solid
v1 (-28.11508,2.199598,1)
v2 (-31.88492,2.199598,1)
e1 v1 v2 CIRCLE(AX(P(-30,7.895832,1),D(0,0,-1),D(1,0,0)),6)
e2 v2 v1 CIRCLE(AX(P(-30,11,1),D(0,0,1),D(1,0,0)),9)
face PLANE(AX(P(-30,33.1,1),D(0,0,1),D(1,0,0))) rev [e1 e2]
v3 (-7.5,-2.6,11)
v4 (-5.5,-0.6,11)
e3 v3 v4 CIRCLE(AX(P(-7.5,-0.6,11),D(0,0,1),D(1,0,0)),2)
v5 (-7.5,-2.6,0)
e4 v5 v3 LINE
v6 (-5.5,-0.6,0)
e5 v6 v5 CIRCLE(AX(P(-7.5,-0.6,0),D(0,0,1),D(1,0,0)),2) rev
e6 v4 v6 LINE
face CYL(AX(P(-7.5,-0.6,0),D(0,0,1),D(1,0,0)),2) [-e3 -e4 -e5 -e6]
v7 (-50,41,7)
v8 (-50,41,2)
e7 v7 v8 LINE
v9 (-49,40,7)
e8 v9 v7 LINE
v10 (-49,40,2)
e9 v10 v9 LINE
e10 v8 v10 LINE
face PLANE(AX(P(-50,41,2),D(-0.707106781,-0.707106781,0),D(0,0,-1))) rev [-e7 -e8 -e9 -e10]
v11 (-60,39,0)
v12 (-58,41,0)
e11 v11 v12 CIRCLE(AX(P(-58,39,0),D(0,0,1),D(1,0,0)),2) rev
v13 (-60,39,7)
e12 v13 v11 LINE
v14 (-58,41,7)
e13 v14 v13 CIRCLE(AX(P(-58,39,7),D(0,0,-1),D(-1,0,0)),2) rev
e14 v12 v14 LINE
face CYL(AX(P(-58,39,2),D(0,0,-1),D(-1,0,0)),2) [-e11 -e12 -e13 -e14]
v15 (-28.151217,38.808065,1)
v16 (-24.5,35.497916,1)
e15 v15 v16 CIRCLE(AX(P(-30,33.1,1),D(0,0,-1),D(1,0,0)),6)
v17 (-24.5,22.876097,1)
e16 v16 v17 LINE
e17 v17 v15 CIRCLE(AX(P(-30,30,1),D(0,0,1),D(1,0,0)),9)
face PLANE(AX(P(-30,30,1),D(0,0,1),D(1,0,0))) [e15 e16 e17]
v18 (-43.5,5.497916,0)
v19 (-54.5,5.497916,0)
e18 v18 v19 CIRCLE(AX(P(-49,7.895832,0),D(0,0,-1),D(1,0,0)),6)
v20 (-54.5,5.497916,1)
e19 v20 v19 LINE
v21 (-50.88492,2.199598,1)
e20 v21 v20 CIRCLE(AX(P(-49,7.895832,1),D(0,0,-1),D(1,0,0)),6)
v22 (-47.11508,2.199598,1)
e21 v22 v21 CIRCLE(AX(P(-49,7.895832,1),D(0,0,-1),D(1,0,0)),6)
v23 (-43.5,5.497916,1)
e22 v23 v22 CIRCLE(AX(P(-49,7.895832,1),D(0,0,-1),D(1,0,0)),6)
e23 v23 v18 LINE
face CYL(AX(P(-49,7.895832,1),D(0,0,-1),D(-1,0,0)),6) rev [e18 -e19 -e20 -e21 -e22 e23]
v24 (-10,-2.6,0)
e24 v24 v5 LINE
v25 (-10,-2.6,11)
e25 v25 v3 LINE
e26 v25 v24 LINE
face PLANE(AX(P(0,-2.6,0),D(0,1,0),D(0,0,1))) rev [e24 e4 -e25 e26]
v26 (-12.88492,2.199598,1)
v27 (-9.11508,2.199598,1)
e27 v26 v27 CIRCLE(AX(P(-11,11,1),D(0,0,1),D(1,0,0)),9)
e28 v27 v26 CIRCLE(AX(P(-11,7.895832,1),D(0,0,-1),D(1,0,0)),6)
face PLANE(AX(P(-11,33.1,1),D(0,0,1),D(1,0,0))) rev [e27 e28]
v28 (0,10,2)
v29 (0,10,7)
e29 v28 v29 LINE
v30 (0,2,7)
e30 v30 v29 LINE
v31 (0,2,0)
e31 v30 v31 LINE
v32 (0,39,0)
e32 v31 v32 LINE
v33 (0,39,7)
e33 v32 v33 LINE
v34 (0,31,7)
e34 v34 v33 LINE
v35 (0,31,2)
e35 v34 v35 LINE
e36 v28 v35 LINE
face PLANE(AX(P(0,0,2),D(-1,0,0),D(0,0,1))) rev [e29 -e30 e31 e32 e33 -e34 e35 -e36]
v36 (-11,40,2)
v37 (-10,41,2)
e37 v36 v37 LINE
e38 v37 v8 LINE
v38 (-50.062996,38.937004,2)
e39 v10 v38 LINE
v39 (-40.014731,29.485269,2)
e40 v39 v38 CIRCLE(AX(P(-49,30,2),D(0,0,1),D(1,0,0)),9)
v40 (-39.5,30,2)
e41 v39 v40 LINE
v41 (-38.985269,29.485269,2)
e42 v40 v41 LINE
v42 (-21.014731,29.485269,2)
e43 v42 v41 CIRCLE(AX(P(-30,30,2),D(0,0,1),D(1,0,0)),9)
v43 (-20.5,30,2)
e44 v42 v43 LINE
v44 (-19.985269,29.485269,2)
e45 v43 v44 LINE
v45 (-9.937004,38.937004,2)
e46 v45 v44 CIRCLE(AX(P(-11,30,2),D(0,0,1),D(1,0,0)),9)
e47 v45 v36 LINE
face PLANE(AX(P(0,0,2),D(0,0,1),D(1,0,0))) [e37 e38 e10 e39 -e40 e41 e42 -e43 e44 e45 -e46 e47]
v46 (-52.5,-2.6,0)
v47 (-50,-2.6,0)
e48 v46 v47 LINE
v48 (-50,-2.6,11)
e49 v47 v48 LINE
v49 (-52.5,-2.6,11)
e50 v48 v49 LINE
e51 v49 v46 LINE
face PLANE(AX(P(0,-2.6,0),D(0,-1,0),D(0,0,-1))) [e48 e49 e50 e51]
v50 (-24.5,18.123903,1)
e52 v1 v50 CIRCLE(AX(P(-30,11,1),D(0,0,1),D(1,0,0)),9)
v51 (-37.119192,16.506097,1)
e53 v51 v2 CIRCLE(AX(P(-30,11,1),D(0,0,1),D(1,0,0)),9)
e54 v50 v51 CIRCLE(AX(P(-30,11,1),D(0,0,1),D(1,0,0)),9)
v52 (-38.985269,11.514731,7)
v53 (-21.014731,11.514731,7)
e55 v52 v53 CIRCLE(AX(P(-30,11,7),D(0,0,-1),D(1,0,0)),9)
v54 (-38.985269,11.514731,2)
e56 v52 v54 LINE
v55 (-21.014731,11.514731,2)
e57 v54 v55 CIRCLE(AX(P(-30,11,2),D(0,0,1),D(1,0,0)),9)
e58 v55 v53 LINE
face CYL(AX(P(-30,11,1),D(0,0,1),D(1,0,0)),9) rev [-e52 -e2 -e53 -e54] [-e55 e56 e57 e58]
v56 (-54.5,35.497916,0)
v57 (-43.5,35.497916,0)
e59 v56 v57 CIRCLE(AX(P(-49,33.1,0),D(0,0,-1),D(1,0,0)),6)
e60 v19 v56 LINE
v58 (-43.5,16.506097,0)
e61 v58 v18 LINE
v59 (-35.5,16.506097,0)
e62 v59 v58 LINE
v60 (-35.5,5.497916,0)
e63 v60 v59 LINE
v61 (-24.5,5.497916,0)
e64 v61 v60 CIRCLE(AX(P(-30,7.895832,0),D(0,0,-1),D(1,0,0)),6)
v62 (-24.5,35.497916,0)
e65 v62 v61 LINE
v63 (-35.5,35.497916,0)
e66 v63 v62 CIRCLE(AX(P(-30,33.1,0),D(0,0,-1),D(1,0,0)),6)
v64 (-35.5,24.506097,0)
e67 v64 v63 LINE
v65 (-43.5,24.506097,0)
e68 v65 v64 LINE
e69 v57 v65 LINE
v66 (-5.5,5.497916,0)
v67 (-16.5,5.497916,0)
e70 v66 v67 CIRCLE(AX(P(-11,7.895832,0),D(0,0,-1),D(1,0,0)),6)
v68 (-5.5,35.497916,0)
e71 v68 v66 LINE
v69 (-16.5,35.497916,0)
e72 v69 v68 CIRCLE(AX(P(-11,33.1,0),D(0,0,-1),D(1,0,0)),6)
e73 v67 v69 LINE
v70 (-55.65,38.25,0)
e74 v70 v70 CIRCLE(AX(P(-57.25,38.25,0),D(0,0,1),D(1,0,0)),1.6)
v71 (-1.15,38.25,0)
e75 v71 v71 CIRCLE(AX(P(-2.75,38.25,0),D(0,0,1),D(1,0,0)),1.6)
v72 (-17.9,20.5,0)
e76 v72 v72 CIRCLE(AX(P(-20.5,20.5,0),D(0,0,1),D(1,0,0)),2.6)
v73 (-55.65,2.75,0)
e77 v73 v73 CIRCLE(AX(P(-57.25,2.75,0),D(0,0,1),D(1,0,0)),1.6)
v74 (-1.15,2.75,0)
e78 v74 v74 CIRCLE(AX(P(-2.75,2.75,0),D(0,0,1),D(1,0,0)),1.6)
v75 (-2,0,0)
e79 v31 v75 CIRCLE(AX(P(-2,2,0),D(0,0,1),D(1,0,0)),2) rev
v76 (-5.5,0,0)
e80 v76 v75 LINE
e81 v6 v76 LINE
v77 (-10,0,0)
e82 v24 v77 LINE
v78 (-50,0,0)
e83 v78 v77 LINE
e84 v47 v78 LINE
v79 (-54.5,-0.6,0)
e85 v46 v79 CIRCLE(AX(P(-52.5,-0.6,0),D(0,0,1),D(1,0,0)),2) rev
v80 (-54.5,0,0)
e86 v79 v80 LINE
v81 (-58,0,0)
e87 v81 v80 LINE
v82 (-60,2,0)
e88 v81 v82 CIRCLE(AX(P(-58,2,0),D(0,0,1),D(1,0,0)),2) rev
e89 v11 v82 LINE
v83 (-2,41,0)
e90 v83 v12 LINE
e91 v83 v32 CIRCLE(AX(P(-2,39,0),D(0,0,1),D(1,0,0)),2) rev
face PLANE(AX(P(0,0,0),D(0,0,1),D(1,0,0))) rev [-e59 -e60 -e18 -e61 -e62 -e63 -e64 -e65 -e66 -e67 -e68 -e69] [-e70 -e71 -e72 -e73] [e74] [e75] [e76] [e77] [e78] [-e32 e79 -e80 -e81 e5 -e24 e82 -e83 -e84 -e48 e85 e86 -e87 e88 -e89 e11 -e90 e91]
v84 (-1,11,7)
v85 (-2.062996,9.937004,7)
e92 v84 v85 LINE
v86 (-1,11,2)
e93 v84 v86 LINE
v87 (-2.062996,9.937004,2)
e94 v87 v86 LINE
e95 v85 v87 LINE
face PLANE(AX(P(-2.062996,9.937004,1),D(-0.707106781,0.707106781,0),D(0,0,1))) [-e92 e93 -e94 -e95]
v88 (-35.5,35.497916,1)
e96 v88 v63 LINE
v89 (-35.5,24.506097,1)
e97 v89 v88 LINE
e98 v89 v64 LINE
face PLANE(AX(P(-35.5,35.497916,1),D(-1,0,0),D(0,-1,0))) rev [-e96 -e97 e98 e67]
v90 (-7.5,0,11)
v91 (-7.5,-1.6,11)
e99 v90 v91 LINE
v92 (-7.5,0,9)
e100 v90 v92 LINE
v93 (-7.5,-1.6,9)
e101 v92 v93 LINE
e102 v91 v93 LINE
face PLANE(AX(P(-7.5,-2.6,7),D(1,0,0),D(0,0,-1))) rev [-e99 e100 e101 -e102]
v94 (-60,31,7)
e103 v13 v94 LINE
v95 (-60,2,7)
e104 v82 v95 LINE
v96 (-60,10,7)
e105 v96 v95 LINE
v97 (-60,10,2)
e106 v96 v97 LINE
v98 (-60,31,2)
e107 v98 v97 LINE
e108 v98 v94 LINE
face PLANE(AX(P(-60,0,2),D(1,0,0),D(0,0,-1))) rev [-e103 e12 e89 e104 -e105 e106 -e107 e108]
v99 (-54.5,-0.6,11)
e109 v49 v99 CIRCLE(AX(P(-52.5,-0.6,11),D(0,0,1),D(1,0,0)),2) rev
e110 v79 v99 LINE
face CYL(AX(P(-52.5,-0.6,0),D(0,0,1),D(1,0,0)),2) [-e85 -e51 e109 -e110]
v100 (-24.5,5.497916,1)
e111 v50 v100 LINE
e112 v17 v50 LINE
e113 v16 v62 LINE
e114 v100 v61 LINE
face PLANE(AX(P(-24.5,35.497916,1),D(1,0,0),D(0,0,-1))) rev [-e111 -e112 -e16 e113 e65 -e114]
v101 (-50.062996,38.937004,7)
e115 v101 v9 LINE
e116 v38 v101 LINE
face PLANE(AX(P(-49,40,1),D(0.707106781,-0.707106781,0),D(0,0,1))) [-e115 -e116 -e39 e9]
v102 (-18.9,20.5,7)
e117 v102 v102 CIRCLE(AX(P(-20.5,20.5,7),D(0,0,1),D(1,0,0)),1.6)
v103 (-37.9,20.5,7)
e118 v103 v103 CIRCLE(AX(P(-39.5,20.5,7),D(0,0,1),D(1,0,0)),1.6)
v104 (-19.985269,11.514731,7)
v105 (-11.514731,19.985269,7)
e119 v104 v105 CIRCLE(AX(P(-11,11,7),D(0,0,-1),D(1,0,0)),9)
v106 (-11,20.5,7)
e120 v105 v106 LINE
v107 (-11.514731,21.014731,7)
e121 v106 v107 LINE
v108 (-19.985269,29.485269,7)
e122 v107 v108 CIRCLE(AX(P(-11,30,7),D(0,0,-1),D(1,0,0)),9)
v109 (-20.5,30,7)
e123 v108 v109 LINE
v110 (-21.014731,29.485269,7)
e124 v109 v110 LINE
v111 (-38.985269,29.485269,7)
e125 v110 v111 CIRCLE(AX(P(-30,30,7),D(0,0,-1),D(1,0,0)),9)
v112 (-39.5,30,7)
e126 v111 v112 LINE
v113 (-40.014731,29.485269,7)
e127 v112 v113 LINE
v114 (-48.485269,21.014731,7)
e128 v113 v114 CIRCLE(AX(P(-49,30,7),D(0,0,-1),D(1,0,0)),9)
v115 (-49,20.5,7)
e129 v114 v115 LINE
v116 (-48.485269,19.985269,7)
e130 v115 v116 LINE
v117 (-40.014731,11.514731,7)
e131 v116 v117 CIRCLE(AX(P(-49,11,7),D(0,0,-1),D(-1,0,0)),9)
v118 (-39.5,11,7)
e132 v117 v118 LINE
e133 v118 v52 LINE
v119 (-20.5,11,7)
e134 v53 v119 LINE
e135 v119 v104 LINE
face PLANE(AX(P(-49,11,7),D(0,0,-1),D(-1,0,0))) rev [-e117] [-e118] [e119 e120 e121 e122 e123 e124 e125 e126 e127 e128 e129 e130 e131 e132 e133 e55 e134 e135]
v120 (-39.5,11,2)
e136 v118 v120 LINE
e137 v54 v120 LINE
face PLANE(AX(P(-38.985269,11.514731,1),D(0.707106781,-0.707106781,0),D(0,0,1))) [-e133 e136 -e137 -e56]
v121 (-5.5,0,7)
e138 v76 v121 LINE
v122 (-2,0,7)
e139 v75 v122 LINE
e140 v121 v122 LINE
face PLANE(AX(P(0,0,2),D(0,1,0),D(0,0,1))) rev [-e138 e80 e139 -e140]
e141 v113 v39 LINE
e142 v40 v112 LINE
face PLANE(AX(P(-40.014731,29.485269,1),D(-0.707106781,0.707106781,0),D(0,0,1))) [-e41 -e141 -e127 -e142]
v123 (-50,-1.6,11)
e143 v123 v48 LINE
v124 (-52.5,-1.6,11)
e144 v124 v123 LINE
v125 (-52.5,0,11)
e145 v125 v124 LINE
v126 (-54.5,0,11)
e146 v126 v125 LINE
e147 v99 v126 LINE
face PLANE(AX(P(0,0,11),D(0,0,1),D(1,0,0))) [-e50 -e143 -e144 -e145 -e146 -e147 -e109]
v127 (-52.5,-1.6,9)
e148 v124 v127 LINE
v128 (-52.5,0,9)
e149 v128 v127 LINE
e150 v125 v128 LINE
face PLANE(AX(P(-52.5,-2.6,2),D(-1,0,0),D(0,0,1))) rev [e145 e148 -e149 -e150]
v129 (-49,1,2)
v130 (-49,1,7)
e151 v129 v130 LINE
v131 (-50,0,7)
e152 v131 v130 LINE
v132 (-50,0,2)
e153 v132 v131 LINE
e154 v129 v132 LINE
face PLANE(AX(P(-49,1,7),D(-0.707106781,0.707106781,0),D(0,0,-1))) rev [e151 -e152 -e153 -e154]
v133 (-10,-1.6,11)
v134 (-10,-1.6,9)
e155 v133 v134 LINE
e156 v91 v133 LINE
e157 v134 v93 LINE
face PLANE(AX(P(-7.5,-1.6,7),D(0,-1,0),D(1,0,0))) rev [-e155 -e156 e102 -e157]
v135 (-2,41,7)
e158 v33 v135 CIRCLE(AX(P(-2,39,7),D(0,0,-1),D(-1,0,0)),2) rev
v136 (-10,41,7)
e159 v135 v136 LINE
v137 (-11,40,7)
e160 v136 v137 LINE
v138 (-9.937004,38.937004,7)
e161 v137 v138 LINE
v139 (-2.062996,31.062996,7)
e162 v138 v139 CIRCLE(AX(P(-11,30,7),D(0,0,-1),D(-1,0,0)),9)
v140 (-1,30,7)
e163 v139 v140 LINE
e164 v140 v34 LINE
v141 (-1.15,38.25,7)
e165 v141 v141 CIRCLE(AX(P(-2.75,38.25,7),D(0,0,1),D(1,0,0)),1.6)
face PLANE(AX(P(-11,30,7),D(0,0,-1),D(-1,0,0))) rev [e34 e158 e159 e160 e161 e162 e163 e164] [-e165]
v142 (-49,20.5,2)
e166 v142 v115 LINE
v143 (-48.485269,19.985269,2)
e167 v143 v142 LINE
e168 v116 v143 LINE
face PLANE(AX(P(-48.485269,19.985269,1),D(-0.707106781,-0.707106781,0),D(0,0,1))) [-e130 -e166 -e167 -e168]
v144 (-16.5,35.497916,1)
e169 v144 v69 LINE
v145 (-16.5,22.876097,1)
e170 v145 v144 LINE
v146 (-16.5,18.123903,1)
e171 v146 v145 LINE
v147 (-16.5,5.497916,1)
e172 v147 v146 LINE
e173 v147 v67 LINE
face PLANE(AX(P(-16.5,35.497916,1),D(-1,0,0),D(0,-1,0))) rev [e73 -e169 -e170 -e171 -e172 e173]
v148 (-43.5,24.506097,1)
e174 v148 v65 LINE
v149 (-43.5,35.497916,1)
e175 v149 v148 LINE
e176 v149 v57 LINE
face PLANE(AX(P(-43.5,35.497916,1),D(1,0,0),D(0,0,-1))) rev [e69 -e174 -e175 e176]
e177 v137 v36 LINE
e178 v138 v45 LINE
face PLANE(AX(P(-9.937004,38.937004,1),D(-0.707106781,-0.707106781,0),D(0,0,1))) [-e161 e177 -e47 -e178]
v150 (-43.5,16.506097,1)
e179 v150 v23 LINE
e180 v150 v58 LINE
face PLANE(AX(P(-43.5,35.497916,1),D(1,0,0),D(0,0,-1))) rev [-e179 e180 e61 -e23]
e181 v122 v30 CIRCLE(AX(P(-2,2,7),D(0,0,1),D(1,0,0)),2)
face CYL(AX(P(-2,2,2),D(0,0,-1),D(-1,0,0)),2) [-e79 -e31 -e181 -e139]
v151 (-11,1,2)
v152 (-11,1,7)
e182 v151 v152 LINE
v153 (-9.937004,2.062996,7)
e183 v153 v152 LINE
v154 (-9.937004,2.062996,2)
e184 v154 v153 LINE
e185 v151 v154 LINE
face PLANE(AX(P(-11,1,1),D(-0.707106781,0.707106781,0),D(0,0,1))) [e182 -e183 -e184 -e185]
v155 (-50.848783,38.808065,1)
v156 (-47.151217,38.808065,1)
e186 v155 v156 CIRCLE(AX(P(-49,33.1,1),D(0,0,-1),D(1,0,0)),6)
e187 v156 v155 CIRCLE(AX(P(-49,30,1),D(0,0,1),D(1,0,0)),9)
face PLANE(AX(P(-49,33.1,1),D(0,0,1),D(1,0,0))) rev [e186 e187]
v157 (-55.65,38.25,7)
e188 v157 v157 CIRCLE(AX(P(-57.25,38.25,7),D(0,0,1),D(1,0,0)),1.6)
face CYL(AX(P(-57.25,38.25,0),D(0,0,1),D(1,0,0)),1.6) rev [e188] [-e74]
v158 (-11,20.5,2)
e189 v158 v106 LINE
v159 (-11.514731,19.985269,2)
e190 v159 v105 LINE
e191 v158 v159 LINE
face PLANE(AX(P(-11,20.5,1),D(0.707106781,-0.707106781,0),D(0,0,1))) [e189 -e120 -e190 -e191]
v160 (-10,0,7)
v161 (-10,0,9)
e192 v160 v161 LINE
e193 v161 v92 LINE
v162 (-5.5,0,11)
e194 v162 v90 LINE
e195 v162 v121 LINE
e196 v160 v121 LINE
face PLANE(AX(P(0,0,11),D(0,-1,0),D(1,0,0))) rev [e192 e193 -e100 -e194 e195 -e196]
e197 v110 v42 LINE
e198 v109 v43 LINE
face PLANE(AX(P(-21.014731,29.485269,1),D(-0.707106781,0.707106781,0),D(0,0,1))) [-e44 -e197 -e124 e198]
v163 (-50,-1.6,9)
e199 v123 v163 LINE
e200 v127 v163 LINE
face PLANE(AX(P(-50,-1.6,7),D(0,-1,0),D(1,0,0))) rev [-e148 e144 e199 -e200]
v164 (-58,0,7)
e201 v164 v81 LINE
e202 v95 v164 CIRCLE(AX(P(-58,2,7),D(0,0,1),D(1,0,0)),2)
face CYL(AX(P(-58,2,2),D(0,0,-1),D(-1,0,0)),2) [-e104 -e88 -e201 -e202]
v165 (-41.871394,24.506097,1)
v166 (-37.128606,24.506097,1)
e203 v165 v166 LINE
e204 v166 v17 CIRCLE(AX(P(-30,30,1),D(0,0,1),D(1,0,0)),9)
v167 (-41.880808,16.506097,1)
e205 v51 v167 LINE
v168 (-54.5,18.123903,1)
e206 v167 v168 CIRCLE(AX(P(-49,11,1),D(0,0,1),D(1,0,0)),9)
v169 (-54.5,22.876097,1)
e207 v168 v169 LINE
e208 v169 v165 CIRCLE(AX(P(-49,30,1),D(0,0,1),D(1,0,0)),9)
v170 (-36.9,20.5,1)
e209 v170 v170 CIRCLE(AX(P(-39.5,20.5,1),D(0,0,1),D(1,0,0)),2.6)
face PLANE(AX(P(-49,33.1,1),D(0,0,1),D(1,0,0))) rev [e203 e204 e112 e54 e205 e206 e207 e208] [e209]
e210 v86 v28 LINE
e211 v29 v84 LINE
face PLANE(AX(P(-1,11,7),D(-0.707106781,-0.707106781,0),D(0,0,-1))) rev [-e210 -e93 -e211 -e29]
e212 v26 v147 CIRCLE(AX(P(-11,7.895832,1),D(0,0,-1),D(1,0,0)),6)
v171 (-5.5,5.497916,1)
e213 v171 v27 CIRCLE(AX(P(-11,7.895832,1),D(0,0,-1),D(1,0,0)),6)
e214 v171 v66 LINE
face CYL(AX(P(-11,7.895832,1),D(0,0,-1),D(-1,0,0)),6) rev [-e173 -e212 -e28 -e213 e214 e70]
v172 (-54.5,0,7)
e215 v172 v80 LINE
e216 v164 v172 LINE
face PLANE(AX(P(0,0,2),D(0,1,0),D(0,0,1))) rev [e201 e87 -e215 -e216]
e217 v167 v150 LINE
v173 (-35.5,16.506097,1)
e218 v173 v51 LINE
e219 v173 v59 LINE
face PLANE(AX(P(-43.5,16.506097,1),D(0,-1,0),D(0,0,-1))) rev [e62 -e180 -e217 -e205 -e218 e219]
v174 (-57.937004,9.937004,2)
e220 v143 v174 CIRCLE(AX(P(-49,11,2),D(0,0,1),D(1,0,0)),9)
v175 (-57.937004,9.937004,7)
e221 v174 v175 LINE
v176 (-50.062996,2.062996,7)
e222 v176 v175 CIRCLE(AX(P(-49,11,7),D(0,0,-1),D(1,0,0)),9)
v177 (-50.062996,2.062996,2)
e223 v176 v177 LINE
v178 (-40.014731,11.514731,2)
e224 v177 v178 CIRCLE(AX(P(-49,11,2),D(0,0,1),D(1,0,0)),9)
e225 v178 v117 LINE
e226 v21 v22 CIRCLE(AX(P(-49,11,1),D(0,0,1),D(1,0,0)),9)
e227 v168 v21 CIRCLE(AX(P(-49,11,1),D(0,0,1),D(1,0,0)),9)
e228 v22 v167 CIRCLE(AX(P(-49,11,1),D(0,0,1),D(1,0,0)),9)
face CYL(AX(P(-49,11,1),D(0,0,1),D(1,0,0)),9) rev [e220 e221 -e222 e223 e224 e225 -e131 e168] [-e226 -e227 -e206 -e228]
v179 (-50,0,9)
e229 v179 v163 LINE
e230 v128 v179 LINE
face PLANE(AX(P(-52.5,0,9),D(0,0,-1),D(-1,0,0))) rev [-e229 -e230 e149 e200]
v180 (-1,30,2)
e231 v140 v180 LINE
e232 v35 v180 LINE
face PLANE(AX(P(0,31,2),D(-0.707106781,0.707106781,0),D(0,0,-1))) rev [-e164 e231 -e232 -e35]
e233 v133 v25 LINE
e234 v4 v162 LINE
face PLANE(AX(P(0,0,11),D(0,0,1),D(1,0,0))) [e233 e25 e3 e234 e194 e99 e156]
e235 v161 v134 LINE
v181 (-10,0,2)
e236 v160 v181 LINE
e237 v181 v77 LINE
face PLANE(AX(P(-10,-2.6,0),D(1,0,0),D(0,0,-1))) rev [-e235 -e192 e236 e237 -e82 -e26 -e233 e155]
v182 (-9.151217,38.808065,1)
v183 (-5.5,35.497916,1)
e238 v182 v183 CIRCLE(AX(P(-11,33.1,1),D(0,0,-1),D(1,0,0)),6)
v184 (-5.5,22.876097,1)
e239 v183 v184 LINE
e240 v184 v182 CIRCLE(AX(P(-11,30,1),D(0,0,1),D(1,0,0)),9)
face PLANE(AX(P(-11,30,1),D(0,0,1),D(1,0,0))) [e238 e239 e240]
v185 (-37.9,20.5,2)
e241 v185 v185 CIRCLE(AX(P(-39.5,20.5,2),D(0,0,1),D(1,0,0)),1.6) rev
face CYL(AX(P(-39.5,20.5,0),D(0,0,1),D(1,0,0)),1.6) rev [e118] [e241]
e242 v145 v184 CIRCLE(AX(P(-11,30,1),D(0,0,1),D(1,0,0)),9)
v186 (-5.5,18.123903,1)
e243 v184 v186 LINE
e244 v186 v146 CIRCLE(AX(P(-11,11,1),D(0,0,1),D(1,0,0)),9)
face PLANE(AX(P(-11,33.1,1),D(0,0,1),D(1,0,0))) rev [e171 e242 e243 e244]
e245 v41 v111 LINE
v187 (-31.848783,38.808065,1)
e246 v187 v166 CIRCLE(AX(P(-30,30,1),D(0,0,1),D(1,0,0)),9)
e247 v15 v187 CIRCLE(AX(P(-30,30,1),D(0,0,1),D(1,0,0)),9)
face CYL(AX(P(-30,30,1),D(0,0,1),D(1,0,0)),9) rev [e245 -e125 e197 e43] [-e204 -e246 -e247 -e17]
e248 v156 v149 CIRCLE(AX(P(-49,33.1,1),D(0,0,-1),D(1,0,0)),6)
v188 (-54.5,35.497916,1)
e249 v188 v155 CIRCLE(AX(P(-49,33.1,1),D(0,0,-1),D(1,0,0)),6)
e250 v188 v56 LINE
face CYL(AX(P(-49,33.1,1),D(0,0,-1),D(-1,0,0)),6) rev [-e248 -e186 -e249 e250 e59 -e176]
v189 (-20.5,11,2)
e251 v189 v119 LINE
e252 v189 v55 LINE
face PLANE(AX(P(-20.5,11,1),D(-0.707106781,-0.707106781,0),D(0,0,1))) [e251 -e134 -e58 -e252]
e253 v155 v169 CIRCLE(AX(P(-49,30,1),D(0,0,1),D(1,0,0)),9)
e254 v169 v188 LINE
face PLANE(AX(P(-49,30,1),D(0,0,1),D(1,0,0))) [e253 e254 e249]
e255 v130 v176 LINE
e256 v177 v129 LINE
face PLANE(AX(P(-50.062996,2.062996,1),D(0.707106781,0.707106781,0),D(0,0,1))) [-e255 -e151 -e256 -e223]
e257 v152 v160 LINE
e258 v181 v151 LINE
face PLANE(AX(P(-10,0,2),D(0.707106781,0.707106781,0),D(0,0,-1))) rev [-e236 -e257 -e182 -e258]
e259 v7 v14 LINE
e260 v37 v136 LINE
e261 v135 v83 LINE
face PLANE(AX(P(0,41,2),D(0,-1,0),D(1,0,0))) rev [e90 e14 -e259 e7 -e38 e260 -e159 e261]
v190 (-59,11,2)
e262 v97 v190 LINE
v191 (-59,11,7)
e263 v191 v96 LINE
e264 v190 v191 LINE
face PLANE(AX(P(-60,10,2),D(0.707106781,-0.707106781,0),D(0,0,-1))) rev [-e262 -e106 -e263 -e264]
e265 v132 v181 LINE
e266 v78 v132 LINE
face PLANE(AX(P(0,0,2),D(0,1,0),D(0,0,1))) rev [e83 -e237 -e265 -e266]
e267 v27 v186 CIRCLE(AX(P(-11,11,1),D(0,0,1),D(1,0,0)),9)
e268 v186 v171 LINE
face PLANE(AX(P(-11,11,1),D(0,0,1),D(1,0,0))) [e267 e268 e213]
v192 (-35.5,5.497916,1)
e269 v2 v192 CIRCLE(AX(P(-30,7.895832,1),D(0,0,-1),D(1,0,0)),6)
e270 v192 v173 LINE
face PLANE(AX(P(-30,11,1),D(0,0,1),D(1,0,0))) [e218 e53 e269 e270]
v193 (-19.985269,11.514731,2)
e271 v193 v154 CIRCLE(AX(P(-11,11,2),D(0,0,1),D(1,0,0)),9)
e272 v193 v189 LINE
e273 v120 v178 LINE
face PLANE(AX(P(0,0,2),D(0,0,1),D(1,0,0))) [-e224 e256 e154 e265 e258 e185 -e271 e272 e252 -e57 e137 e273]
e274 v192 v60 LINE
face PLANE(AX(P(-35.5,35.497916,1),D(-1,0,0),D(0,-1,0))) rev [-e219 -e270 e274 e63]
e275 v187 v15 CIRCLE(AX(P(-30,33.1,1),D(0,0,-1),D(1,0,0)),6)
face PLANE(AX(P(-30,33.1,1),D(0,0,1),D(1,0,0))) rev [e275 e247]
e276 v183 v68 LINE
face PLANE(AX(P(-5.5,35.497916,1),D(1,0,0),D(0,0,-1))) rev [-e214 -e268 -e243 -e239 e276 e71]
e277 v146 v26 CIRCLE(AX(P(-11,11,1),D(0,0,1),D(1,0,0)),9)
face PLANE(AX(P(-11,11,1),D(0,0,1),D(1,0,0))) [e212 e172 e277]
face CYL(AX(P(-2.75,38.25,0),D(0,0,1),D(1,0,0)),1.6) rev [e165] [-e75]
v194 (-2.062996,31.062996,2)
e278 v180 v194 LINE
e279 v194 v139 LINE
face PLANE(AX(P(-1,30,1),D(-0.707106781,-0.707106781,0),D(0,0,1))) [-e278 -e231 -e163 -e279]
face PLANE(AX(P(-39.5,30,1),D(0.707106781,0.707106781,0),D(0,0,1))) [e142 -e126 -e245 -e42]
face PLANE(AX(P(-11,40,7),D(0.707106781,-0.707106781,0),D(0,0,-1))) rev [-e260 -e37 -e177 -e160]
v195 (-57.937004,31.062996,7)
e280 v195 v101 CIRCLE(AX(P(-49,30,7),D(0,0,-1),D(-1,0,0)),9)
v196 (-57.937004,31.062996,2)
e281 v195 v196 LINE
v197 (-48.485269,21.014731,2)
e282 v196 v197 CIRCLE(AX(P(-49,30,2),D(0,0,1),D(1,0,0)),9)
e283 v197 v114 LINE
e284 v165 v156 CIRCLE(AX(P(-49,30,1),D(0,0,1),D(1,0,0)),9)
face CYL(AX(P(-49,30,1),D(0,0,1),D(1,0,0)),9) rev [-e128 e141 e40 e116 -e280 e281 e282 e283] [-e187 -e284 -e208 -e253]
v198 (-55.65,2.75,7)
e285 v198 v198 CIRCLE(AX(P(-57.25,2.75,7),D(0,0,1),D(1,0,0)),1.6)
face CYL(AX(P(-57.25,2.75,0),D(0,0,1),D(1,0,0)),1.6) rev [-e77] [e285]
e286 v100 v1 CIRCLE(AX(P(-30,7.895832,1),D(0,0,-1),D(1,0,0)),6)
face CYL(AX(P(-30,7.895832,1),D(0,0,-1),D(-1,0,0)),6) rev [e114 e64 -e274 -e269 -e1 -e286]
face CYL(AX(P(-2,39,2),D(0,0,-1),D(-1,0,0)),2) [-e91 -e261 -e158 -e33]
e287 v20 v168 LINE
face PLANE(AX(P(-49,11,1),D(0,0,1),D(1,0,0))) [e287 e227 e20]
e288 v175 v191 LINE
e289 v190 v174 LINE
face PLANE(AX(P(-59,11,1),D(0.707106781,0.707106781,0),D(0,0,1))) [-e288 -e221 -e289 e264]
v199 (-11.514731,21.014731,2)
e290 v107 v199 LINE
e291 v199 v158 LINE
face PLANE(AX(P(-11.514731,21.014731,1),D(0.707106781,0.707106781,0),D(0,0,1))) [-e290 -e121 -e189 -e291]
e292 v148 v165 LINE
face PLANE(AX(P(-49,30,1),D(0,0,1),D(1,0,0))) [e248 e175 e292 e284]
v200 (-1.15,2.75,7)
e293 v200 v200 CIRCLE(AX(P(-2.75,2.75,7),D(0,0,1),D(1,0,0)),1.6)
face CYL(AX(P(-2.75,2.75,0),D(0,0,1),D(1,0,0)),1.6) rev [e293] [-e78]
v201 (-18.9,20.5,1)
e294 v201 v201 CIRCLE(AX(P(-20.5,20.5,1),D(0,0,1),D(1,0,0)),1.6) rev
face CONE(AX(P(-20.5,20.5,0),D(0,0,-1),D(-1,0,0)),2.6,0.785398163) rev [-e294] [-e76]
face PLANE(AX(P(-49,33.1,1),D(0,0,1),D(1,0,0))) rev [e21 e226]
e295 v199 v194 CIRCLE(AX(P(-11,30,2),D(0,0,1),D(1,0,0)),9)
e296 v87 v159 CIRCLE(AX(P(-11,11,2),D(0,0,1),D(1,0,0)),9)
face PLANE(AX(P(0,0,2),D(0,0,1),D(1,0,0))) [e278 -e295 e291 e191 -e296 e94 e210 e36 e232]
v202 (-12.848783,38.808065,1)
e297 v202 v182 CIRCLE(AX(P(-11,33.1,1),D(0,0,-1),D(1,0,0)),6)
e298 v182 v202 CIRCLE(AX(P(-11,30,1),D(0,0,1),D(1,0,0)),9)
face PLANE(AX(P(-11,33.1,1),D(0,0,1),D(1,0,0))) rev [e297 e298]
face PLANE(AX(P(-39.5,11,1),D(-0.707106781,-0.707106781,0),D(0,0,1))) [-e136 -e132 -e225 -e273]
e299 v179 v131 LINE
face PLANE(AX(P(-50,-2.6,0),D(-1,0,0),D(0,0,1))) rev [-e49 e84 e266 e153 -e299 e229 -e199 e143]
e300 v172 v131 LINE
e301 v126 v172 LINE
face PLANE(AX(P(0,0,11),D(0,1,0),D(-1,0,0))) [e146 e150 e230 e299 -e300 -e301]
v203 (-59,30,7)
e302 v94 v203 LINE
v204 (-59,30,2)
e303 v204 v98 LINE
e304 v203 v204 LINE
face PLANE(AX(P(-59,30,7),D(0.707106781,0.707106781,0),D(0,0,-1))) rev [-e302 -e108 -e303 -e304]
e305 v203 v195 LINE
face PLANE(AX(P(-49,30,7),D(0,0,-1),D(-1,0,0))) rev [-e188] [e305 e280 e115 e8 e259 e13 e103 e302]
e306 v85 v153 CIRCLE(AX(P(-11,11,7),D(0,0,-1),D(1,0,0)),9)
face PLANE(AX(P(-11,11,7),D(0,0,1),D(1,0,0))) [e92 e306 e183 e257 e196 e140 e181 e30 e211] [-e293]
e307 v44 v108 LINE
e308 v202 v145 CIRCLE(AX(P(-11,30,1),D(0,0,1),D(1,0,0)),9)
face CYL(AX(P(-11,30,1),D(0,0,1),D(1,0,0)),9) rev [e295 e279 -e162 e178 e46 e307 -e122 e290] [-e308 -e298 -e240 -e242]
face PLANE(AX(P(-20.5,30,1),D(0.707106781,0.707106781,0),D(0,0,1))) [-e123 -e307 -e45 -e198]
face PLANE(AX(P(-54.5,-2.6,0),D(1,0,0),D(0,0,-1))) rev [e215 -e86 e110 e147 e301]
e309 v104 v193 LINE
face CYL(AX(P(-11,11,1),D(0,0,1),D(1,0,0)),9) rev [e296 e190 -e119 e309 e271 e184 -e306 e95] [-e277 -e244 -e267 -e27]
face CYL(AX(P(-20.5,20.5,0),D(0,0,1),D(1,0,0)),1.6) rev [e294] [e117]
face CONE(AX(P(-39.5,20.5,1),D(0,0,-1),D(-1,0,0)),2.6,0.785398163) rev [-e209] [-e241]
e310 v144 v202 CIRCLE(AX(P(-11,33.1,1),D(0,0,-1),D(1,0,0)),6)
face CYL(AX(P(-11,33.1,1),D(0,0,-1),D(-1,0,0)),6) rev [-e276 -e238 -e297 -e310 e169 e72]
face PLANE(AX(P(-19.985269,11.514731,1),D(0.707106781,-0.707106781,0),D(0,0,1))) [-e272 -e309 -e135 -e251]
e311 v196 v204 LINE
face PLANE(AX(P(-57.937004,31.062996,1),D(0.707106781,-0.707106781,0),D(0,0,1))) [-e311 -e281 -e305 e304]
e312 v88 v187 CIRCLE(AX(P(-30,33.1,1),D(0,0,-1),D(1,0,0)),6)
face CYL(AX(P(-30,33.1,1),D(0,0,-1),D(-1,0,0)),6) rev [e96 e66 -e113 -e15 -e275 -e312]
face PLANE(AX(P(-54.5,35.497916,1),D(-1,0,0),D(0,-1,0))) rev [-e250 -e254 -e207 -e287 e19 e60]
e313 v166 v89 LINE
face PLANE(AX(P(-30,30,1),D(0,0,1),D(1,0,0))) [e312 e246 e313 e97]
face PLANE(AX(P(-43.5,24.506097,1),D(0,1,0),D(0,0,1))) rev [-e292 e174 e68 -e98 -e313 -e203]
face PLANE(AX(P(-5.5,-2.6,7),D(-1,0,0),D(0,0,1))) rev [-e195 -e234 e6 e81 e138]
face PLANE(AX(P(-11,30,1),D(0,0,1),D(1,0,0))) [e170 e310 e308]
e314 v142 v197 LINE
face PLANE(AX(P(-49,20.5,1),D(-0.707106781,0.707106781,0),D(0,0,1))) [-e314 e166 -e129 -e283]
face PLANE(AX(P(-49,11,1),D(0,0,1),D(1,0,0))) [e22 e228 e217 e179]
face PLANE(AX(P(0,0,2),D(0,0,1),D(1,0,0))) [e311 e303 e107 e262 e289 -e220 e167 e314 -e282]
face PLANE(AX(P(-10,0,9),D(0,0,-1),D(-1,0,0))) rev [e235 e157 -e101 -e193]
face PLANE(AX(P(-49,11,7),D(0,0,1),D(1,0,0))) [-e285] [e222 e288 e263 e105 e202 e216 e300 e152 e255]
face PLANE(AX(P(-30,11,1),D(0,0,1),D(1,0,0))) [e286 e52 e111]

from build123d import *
from build123d.topology import SkipClean

# Parameters (mm, degrees)
SKETCH1_W           = 60
SKETCH1_H           = 41
BOSS_EXTRUDE1_DEPTH = 2
SKETCH2_R           = 9
CUT_EXTRUDE1_DEPTH  = 1
CUT_EXTRUDE2_DEPTH  = 1
SKETCH4_W           = 8
SKETCH4_H           = 8
CUT_EXTRUDE3_DEPTH  = 1
BOSS_EXTRUDE2_START = 5
BOSS_EXTRUDE2_DEPTH = 5
SKETCH6_R           = 1.6
CUT_EXTRUDE4_DEPTH  = 74.006848994
CHAMFER1_SIZE       = 1
CHAMFER2_SIZE       = 0.5
CHAMFER3_SIZE       = 1
FILLET1_R           = 2
BOSS_EXTRUDE3_DEPTH = 2.6
SKETCH8_W           = 2.5
SKETCH8_H           = 1
BOSS_EXTRUDE4_DEPTH = 5
FILLET2_R           = 2
BOSS_EXTRUDE5_START = 4
BOSS_EXTRUDE5_DEPTH = 4
SKETCH10_W          = 2.5
SKETCH10_H          = 7
BOSS_EXTRUDE6_DEPTH = 1.6


with BuildPart() as part:
    # Sketch1 → Boss-Extrude1 (new body)
    with BuildSketch(Plane.XY):
        with Locations((-30, 20.5)):
            Rectangle(SKETCH1_W, SKETCH1_H)
    extrude(amount=BOSS_EXTRUDE1_DEPTH)

    # Sketch2 → Cut-Extrude1 (cut)
    with BuildSketch(Plane.XY.offset(2)):
        with Locations((-49, 11)):
            Circle(SKETCH2_R)
        with Locations((-30, 11)):
            Circle(SKETCH2_R)
        with Locations((-11, 11)):
            Circle(SKETCH2_R)
        with Locations((-30, 30)):
            Circle(SKETCH2_R)
        with Locations((-11, 30)):
            Circle(SKETCH2_R)
        with Locations((-49, 30)):
            Circle(SKETCH2_R)
    extrude(amount=-CUT_EXTRUDE1_DEPTH, mode=Mode.SUBTRACT)

    # Sketch3 → Cut-Extrude2 (cut)
    with BuildSketch(Plane(origin=(0, 0, 0), x_dir=(-1, 0, 0), z_dir=(0, 0, -1))):
        with BuildLine():
            Line((54.5, 35.497915762), (54.5, 5.497915762))
            ThreePointArc((54.5, 5.497915762), (49, 1.895831523), (43.5, 5.497915762))
            Line((43.5, 5.497915762), (43.5, 35.497915762))
            ThreePointArc((43.5, 35.497915762), (49, 39.1), (54.5, 35.497915762))
        make_face()
        with BuildLine():
            Line((35.5, 35.497915762), (35.5, 5.497915762))
            ThreePointArc((35.5, 5.497915762), (30, 1.895831523), (24.5, 5.497915762))
            Line((24.5, 5.497915762), (24.5, 35.497915762))
            ThreePointArc((24.5, 35.497915762), (30, 39.1), (35.5, 35.497915762))
        make_face()
        with BuildLine():
            Line((16.5, 35.497915762), (16.5, 5.497915762))
            ThreePointArc((16.5, 5.497915762), (11, 1.895831523), (5.5, 5.497915762))
            Line((5.5, 5.497915762), (5.5, 35.497915762))
            ThreePointArc((5.5, 35.497915762), (11, 39.1), (16.5, 35.497915762))
        make_face()
    extrude(amount=-CUT_EXTRUDE2_DEPTH, mode=Mode.SUBTRACT)

    # Sketch4 → Cut-Extrude3 (cut)
    with BuildSketch(Plane(origin=(0, 0, 0), x_dir=(-1, 0, 0), z_dir=(0, 0, -1))):
        with Locations((39.5, 20.506096576)):
            Rectangle(SKETCH4_W, SKETCH4_H)
    extrude(amount=-CUT_EXTRUDE3_DEPTH, mode=Mode.SUBTRACT)

    # Sketch5 → Boss-Extrude2 (add)
    with SkipClean():  # the faces are left unmerged after this step: merging them gives an invalid solid
        with BuildSketch(Plane.XY.offset(2).offset(BOSS_EXTRUDE2_START)):
            with BuildLine():
                Line((-49, 20), (-49, 21))
                ThreePointArc((-49, 21), (-42.636038969, 23.636038969), (-40, 30))
                Line((-40, 30), (-39, 30))
                ThreePointArc((-39, 30), (-36.363961031, 23.636038969), (-30, 21))
                ThreePointArc((-30, 21), (-23.636038969, 23.636038969), (-21, 30))
                Line((-21, 30), (-20, 30))
                ThreePointArc((-20, 30), (-17.363961031, 23.636038969), (-11, 21))
                Line((-11, 21), (-11, 20))
                ThreePointArc((-11, 20), (-17.363961031, 17.363961031), (-20, 11))
                Line((-20, 11), (-21, 11))
                ThreePointArc((-21, 11), (-23.636038969, 17.363961031), (-30, 20))
                ThreePointArc((-30, 20), (-36.363961031, 17.363961031), (-39, 11))
                Line((-39, 11), (-40, 11))
                ThreePointArc((-40, 11), (-42.636038969, 17.363961031), (-49, 20))
            make_face()
            with BuildLine():
                Line((-2, 30), (0, 30))
                Line((0, 30), (0, 41))
                Line((0, 41), (-11, 41))
                Line((-11, 41), (-11, 39))
                ThreePointArc((-11, 39), (-4.636038969, 36.363961031), (-2, 30))
            make_face()
            with BuildLine():
                Line((-2, 11), (0, 11))
                Line((0, 11), (0, 0))
                Line((0, 0), (-11, 0))
                Line((-11, 0), (-11, 2))
                ThreePointArc((-11, 2), (-4.636038969, 4.636038969), (-2, 11))
            make_face()
            with BuildLine():
                Line((-49, 2), (-49, 0))
                Line((-49, 0), (-60, 0))
                Line((-60, 0), (-60, 11))
                Line((-60, 11), (-58, 11))
                ThreePointArc((-58, 11), (-55.363961031, 4.636038969), (-49, 2))
            make_face()
            with BuildLine():
                Line((-58, 30), (-60, 30))
                Line((-60, 30), (-60, 41))
                Line((-60, 41), (-49, 41))
                Line((-49, 41), (-49, 39))
                ThreePointArc((-49, 39), (-55.363961031, 36.363961031), (-58, 30))
            make_face()
        extrude(amount=-BOSS_EXTRUDE2_DEPTH)

    # Sketch6 → Cut-Extrude4 (cut, through all)
    with SkipClean():  # the faces are left unmerged after this step: merging them gives an invalid solid
        with BuildSketch(Plane.XY.offset(7)):
            with Locations((-39.5, 20.5)):
                Circle(SKETCH6_R)
            with Locations((-20.5, 20.5)):
                Circle(SKETCH6_R)
            with Locations((-2.75, 2.75)):
                Circle(SKETCH6_R)
            with Locations((-2.75, 38.25)):
                Circle(SKETCH6_R)
            with Locations((-57.25, 38.25)):
                Circle(SKETCH6_R)
            with Locations((-57.25, 2.75)):
                Circle(SKETCH6_R)
        extrude(amount=-CUT_EXTRUDE4_DEPTH, mode=Mode.SUBTRACT)

    # Chamfer1
    chamfer1_edges = [part.edges().sort_by_distance(p)[0] for p in [
        (-22.1, 20.5, 0),
        (-41.1, 20.5, 1),
    ]]
    chamfer(chamfer1_edges, length=CHAMFER1_SIZE)

    # Chamfer2
    # the kernel refuses this chamfer: 0.5 mm, written as the material it takes off along each edge
    with BuildSketch(Plane(origin=(-39, 30, 8.324152825), x_dir=(-1, 0, 0), z_dir=(0, 0, -1)), Plane(origin=(-49, 21, 8.324152825), x_dir=(0, -1, 0), z_dir=(0, 0, -1)), Plane(origin=(-40, 11, 8.324152825), x_dir=(1, 0, 0), z_dir=(0, 0, -1)), Plane(origin=(-21, 11, 8.324152825), x_dir=(1, 0, 0), z_dir=(0, 0, -1)), Plane(origin=(-11, 20, 8.324152825), x_dir=(0, 1, 0), z_dir=(0, 0, -1)), Plane(origin=(-20, 30, 8.324152825), x_dir=(-1, 0, 0), z_dir=(0, 0, -1))) as chamfer2_piece_1:
        with BuildLine():
            Line((CHAMFER2_SIZE, 0), (-0.014731413, -0.514731413))
            ThreePointArc((-0.014731413, -0.514731413), (-0.003894786, -0.264747015), (0, 0))
            Line((0, 0), (CHAMFER2_SIZE, 0))
        make_face()
    extrude(amount=6.324152825, mode=Mode.SUBTRACT)
    with BuildSketch(Plane(origin=(-40, 30, 8.324152825), x_dir=(1, 0, 0), z_dir=(0, 0, -1)), Plane(origin=(-49, 20, 8.324152825), x_dir=(0, 1, 0), z_dir=(0, 0, -1)), Plane(origin=(-39, 11, 8.324152825), x_dir=(-1, 0, 0), z_dir=(0, 0, -1)), Plane(origin=(-20, 11, 8.324152825), x_dir=(-1, 0, 0), z_dir=(0, 0, -1)), Plane(origin=(-11, 21, 8.324152825), x_dir=(0, -1, 0), z_dir=(0, 0, -1)), Plane(origin=(-21, 30, 8.324152825), x_dir=(1, 0, 0), z_dir=(0, 0, -1))) as chamfer2_piece_2:
        with BuildLine():
            Line((CHAMFER2_SIZE, 0), (-0.014731413, 0.514731413))
            ThreePointArc((-0.014731413, 0.514731413), (-0.003894786, 0.264747015), (0, 0))
            Line((0, 0), (CHAMFER2_SIZE, 0))
        make_face()
    extrude(amount=6.324152825, mode=Mode.SUBTRACT)

    # Chamfer3
    # the kernel refuses this chamfer: 1 mm, written as the material it takes off along each edge
    with BuildSketch(Plane(origin=(-49, 39, 9.73772815), x_dir=(0, 1, 0), z_dir=(0, 0, -1)), Plane(origin=(-2, 30, 9.73772815), x_dir=(1, 0, 0), z_dir=(0, 0, -1)), Plane(origin=(-11, 2, 9.73772815), x_dir=(0, -1, 0), z_dir=(0, 0, -1)), Plane(origin=(-58, 11, 9.73772815), x_dir=(-1, 0, 0), z_dir=(0, 0, -1))) as chamfer3_piece_1:
        with BuildLine():
            Line((CHAMFER3_SIZE, 0), (-0.062996063, -1.062996063))
            ThreePointArc((-0.062996063, -1.062996063), (-0.016662827, -0.547405922), (0, 0))
            Line((0, 0), (CHAMFER3_SIZE, 0))
        make_face()
    extrude(amount=7.73772815, mode=Mode.SUBTRACT)
    with BuildSketch(Plane(origin=(-49, 41, 9.571682988), x_dir=(-1, 0, 0), z_dir=(0, 0, -1)), Plane(origin=(0, 30, 9.571682988), x_dir=(0, 1, 0), z_dir=(0, 0, -1)), Plane(origin=(-11, 0, 9.571682988), x_dir=(1, 0, 0), z_dir=(0, 0, -1)), Plane(origin=(-60, 11, 9.571682988), x_dir=(0, -1, 0), z_dir=(0, 0, -1))) as chamfer3_piece_2:
        Polygon((CHAMFER3_SIZE, 0), (0, -CHAMFER3_SIZE), (0, 0), align=None)
    extrude(amount=7.571682988, mode=Mode.SUBTRACT)
    with BuildSketch(Plane(origin=(-11, 39, 9.73772815), x_dir=(0, 1, 0), z_dir=(0, 0, -1)), Plane(origin=(-2, 11, 9.73772815), x_dir=(1, 0, 0), z_dir=(0, 0, -1)), Plane(origin=(-49, 2, 9.73772815), x_dir=(0, -1, 0), z_dir=(0, 0, -1)), Plane(origin=(-58, 30, 9.73772815), x_dir=(-1, 0, 0), z_dir=(0, 0, -1))) as chamfer3_piece_3:
        with BuildLine():
            Line((CHAMFER3_SIZE, 0), (-0.062996063, 1.062996063))
            ThreePointArc((-0.062996063, 1.062996063), (-0.016662827, 0.547405922), (0, 0))
            Line((0, 0), (CHAMFER3_SIZE, 0))
        make_face()
    extrude(amount=7.73772815, mode=Mode.SUBTRACT)
    with BuildSketch(Plane(origin=(-11, 41, 9.571682988), x_dir=(1, 0, 0), z_dir=(0, 0, -1)), Plane(origin=(0, 11, 9.571682988), x_dir=(0, -1, 0), z_dir=(0, 0, -1)), Plane(origin=(-49, 0, 9.571682988), x_dir=(-1, 0, 0), z_dir=(0, 0, -1)), Plane(origin=(-60, 30, 9.571682988), x_dir=(0, 1, 0), z_dir=(0, 0, -1))) as chamfer3_piece_4:
        Polygon((CHAMFER3_SIZE, 0), (0, CHAMFER3_SIZE), (0, 0), align=None)
    extrude(amount=7.571682988, mode=Mode.SUBTRACT)

    # Fillet1
    fillet1_edges = [part.edges().sort_by_distance(p)[0] for p in [
        (0, 0, 3.5),
        (-60, 0, 3.5),
        (-60, 41, 3.5),
        (0, 41, 3.5),
    ]]
    fillet(fillet1_edges, radius=FILLET1_R)

    # Sketch7 → Boss-Extrude3 (add)
    with BuildSketch(Plane(origin=(0, 0, 0), x_dir=(-1, 0, 0), z_dir=(0, -1, 0))):
        Polygon((5.5, -7), (7.5, -7), (7.5, -2), (10, -2), (10, 0), (7.5, 0), (5.5, 0), align=None)
        Polygon((50, 0), (52.5, 0), (54.5, 0), (54.5, -7), (52.5, -7), (52.5, -2), (50, -2), align=None)
    extrude(amount=BOSS_EXTRUDE3_DEPTH)

    # Sketch8 → Boss-Extrude4 (add)
    with BuildSketch(Plane.XY.offset(2)):
        with Locations((-8.75, -2.1)):
            Rectangle(SKETCH8_W, SKETCH8_H)
        with Locations((-51.25, -2.1)):
            Rectangle(SKETCH8_W, SKETCH8_H)
    extrude(amount=BOSS_EXTRUDE4_DEPTH)

    # Fillet2
    fillet2_edges = [part.edges().sort_by_distance(p)[0] for p in [
        (-5.5, -2.6, 3.5),
        (-54.5, -2.6, 3.5),
    ]]
    fillet(fillet2_edges, radius=FILLET2_R)

    # Sketch9 → Boss-Extrude5 (add)
    with BuildSketch(Plane.XY.offset(7).offset(BOSS_EXTRUDE5_START)):
        with BuildLine():
            Line((-5.5, 0), (-7.5, 0))
            Line((-7.5, 0), (-7.5, -1.6))
            Line((-7.5, -1.6), (-10, -1.6))
            Line((-10, -1.6), (-10, -2.6))
            Line((-10, -2.6), (-7.5, -2.6))
            ThreePointArc((-7.5, -2.6), (-6.085786438, -2.014213562), (-5.5, -0.6))
            Line((-5.5, -0.6), (-5.5, 0))
        make_face()
        with BuildLine():
            ThreePointArc((-52.5, -2.6), (-53.914213562, -2.014213562), (-54.5, -0.6))
            Line((-54.5, -0.6), (-54.5, 0))
            Line((-54.5, 0), (-52.5, 0))
            Line((-52.5, 0), (-52.5, -1.6))
            Line((-52.5, -1.6), (-50, -1.6))
            Line((-50, -1.6), (-50, -2.6))
            Line((-50, -2.6), (-52.5, -2.6))
        make_face()
    extrude(amount=-BOSS_EXTRUDE5_DEPTH)

    # Sketch10 → Boss-Extrude6 (add)
    with BuildSketch(Plane(origin=(0, -1.6, 0), x_dir=(1, 0, 0), z_dir=(0, 1, 0))):
        with Locations((-8.75, -5.5)):
            Rectangle(SKETCH10_W, SKETCH10_H)
        with Locations((-51.25, -5.5)):
            Rectangle(SKETCH10_W, SKETCH10_H)
    extrude(amount=BOSS_EXTRUDE6_DEPTH)


solid = part.part
